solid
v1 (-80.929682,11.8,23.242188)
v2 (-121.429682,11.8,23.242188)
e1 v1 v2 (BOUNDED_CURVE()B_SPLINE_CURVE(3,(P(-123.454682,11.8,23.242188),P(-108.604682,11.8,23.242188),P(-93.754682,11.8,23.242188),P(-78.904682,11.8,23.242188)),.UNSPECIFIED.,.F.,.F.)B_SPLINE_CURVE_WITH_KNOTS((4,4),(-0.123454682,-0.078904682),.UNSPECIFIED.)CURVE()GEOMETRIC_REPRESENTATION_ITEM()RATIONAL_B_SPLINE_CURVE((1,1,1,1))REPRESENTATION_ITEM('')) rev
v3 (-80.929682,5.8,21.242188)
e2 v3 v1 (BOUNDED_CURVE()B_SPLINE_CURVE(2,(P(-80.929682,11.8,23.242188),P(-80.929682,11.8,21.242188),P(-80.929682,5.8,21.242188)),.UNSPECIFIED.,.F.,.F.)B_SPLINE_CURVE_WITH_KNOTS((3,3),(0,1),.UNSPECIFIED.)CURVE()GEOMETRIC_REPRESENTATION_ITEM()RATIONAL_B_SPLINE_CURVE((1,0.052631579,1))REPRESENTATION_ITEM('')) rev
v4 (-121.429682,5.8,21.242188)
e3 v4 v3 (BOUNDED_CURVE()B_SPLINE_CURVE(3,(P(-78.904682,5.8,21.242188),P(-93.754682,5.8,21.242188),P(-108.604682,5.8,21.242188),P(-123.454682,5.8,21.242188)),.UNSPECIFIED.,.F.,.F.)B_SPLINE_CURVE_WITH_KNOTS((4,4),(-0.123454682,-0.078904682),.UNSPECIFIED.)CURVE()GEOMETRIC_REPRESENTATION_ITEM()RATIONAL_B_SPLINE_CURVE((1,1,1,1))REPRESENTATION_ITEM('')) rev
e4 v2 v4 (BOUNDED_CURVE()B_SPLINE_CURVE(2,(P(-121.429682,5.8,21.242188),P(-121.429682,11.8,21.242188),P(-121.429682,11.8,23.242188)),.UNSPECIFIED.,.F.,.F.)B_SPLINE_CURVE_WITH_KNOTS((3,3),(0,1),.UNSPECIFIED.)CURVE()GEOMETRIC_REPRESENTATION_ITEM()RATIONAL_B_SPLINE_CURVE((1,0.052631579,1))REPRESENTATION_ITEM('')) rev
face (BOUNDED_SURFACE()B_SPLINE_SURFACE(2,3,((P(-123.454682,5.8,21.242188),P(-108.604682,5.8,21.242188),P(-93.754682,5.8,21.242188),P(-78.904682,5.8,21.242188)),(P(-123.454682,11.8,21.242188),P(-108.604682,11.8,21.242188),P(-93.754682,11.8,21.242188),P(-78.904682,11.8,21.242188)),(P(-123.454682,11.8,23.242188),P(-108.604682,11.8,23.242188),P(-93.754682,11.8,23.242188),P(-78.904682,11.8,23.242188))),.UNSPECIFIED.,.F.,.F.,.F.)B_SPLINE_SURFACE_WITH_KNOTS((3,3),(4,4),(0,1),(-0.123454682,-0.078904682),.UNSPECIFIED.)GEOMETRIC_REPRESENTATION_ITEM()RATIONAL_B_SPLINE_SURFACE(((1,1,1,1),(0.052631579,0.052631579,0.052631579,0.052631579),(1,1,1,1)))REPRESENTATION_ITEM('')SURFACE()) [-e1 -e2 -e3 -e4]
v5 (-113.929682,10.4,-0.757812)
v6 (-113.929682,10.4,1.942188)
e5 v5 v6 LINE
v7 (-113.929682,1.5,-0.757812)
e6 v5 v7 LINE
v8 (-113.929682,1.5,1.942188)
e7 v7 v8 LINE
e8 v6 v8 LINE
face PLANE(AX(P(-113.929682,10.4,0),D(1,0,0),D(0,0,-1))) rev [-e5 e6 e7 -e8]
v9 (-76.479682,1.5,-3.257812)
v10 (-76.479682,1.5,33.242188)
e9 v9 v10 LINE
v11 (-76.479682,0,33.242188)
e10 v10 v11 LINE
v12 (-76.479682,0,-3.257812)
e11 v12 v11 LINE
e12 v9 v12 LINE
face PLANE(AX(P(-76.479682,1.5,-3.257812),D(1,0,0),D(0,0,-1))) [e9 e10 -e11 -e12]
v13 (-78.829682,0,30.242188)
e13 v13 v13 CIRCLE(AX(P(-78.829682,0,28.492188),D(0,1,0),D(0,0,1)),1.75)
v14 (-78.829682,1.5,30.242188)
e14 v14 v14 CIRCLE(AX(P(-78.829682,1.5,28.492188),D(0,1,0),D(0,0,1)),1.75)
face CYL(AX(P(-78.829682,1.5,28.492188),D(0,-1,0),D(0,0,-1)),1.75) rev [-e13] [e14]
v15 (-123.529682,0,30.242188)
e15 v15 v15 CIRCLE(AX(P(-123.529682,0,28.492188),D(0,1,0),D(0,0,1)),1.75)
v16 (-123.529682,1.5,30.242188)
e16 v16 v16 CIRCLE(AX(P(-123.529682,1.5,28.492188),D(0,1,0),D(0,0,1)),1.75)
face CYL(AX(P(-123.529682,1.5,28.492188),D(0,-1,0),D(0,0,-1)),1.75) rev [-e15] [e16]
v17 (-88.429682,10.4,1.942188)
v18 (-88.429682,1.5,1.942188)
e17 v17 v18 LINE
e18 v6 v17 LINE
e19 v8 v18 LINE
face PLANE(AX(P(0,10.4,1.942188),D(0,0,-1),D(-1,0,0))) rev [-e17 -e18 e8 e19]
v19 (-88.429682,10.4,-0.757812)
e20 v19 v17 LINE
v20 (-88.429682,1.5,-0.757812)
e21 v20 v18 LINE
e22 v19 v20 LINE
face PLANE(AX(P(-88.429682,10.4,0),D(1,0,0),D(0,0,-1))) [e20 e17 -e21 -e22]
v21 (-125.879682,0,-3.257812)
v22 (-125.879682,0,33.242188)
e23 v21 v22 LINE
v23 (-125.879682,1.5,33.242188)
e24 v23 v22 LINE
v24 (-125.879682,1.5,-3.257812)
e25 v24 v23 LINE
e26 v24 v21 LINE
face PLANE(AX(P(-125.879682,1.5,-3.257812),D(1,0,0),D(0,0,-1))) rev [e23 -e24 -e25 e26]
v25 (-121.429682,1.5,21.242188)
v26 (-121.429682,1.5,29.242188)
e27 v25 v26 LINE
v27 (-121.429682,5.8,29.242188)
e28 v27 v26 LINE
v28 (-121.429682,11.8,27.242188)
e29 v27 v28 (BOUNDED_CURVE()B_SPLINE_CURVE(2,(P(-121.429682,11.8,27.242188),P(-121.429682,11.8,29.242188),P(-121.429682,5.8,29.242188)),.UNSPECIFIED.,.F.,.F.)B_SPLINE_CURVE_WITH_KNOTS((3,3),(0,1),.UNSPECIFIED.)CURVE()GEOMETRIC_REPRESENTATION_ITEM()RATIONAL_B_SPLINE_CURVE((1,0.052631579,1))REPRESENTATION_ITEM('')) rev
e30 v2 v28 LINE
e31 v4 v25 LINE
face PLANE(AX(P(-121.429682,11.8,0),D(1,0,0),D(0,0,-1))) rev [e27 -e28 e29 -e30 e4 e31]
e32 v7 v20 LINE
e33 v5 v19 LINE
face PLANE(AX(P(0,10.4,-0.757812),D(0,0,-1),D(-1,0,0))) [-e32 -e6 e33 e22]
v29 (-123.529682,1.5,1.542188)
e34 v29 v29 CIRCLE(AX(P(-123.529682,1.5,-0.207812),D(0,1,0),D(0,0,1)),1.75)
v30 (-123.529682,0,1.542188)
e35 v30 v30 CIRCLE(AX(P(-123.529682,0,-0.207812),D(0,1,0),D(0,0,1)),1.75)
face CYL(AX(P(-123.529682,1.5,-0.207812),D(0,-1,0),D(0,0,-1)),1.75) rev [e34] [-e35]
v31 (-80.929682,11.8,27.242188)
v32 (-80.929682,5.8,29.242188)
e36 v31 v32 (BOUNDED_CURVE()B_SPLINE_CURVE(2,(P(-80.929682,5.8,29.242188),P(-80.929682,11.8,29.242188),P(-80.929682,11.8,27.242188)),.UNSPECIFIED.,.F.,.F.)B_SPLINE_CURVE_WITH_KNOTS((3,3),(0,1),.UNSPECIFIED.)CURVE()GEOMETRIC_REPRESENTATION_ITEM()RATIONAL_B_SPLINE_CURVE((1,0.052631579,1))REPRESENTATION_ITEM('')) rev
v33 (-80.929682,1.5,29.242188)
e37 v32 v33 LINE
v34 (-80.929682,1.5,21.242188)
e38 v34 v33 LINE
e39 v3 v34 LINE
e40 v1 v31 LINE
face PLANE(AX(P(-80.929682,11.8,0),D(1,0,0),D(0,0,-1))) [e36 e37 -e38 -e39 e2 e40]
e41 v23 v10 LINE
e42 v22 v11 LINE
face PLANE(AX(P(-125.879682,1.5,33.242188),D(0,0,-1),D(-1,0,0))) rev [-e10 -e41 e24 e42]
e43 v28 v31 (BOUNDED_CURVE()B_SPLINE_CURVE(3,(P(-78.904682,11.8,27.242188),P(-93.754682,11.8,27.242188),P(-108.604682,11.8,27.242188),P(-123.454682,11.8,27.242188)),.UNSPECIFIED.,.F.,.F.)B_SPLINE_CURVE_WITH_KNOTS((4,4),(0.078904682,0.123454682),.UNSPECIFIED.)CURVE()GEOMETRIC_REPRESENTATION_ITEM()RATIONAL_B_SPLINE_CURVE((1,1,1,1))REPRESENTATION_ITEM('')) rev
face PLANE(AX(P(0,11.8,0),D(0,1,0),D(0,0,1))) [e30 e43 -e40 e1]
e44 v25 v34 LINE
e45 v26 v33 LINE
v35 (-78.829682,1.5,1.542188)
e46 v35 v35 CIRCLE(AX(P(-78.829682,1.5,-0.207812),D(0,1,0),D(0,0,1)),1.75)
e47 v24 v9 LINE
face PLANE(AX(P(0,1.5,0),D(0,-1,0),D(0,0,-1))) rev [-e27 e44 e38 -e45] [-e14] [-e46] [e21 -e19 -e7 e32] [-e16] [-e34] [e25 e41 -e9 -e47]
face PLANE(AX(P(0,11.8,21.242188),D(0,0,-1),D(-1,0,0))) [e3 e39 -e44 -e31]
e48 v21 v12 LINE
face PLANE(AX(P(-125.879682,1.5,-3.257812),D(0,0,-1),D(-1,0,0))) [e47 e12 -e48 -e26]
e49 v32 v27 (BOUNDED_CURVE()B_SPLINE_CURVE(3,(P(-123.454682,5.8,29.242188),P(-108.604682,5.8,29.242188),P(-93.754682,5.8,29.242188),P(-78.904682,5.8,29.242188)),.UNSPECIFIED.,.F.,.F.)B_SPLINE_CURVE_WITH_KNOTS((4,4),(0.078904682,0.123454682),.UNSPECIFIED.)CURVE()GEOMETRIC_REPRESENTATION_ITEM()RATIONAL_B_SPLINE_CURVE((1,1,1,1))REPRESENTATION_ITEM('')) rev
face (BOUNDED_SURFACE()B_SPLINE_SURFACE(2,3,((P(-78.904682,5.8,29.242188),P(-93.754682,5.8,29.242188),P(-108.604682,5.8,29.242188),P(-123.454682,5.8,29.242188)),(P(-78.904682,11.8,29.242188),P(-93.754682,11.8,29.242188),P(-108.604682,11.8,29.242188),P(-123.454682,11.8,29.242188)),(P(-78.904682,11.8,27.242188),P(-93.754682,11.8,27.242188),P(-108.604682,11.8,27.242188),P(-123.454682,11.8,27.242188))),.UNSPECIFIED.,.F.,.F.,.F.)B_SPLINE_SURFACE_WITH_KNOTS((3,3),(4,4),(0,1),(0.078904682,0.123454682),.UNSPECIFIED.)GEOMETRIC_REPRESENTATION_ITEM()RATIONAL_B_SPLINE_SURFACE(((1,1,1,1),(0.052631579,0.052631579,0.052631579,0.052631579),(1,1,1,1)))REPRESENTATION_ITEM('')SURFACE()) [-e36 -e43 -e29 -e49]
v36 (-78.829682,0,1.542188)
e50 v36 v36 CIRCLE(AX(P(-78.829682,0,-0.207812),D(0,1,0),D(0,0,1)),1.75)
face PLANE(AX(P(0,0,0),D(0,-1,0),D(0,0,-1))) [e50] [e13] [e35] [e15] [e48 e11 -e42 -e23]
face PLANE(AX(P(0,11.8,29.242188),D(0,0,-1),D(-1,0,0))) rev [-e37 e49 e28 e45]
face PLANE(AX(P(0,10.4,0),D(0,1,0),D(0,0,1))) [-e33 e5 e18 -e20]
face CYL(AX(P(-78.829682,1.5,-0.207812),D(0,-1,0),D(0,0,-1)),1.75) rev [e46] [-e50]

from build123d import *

# Parameters (mm, degrees)
SKETCH1_W           = 49.4
SKETCH1_H           = 36.5
SKETCH1_R           = 1.75
BOSS_EXTRUDE1_DEPTH = 1.5
SKETCH1_3_W         = 40.5
SKETCH1_3_H         = 8
BOSS_EXTRUDE2_DEPTH = 11.8
FILLET1_SIZE        = 6
FILLET1_SIZE_2      = 2
FILLET2_SIZE        = 6
FILLET2_SIZE_2      = 2
SKETCH1_4_W         = 25.5
SKETCH1_4_H         = 2.7
BOSS_EXTRUDE3_DEPTH = 10.4


with BuildPart() as part:
    # Sketch1 → Boss-Extrude1 (new body)
    with BuildSketch(Plane(origin=(0, 0, 0), x_dir=(1, 0, 0), z_dir=(0, 1, 0))):
        with Locations((-101.179682497, -14.992188262)):
            Rectangle(SKETCH1_W, SKETCH1_H)
        with Locations(Location((-123.529682497, 0.207811738, 0), (0, 0, 270))):
            Circle(SKETCH1_R, mode=Mode.SUBTRACT)
        with Locations(Location((-78.829682497, 0.207811738, 0), (0, 0, 270))):
            Circle(SKETCH1_R, mode=Mode.SUBTRACT)
        with Locations(Location((-123.529682497, -28.492188262, 0), (0, 0, 270))):
            Circle(SKETCH1_R, mode=Mode.SUBTRACT)
        with Locations(Location((-78.829682497, -28.492188262, 0), (0, 0, 270))):
            Circle(SKETCH1_R, mode=Mode.SUBTRACT)
    extrude(amount=BOSS_EXTRUDE1_DEPTH)

    # Sketch1<3> → Boss-Extrude2 (add)
    with BuildSketch(Plane(origin=(0, 0, 0), x_dir=(1, 0, 0), z_dir=(0, 1, 0))):
        with Locations((-101.179682497, -25.242188262)):
            Rectangle(SKETCH1_3_W, SKETCH1_3_H)
    extrude(amount=BOSS_EXTRUDE2_DEPTH)

    # Fillet1
    # a fillet whose section is not a circle: 6, 2 mm, written as the material it takes off along each edge
    with BuildSketch(Plane(origin=(-136.429682497, 11.8, 21.242188262), x_dir=(0, -1, 0), z_dir=(1, 0, 0))) as fillet1_piece_1:
        with BuildLine():
            Bezier((FILLET1_SIZE, 0), (0, 0), (0, -FILLET1_SIZE_2), weights=[1, 0.052631579, 1])
            Line((0, -FILLET1_SIZE_2), (0, 0))
            Line((0, 0), (FILLET1_SIZE, 0))
        make_face()
    extrude(amount=70.5, mode=Mode.SUBTRACT)

    # Fillet2
    # a fillet whose section is not a circle: 6, 2 mm, written as the material it takes off along each edge
    with BuildSketch(Plane(origin=(-65.929682497, 11.8, 29.242188262), x_dir=(0, -1, 0), z_dir=(-1, 0, 0))) as fillet2_piece_1:
        with BuildLine():
            Bezier((FILLET2_SIZE, 0), (0, 0), (0, -FILLET2_SIZE_2), weights=[1, 0.052631579, 1])
            Line((0, -FILLET2_SIZE_2), (0, 0))
            Line((0, 0), (FILLET2_SIZE, 0))
        make_face()
    extrude(amount=70.5, mode=Mode.SUBTRACT)

    # Sketch1<4> → Boss-Extrude3 (add)
    with BuildSketch(Plane(origin=(0, 0, 0), x_dir=(1, 0, 0), z_dir=(0, 1, 0))):
        with Locations((-101.179682497, -0.592188262)):
            Rectangle(SKETCH1_4_W, SKETCH1_4_H)
    extrude(amount=BOSS_EXTRUDE3_DEPTH)


solid = part.part
